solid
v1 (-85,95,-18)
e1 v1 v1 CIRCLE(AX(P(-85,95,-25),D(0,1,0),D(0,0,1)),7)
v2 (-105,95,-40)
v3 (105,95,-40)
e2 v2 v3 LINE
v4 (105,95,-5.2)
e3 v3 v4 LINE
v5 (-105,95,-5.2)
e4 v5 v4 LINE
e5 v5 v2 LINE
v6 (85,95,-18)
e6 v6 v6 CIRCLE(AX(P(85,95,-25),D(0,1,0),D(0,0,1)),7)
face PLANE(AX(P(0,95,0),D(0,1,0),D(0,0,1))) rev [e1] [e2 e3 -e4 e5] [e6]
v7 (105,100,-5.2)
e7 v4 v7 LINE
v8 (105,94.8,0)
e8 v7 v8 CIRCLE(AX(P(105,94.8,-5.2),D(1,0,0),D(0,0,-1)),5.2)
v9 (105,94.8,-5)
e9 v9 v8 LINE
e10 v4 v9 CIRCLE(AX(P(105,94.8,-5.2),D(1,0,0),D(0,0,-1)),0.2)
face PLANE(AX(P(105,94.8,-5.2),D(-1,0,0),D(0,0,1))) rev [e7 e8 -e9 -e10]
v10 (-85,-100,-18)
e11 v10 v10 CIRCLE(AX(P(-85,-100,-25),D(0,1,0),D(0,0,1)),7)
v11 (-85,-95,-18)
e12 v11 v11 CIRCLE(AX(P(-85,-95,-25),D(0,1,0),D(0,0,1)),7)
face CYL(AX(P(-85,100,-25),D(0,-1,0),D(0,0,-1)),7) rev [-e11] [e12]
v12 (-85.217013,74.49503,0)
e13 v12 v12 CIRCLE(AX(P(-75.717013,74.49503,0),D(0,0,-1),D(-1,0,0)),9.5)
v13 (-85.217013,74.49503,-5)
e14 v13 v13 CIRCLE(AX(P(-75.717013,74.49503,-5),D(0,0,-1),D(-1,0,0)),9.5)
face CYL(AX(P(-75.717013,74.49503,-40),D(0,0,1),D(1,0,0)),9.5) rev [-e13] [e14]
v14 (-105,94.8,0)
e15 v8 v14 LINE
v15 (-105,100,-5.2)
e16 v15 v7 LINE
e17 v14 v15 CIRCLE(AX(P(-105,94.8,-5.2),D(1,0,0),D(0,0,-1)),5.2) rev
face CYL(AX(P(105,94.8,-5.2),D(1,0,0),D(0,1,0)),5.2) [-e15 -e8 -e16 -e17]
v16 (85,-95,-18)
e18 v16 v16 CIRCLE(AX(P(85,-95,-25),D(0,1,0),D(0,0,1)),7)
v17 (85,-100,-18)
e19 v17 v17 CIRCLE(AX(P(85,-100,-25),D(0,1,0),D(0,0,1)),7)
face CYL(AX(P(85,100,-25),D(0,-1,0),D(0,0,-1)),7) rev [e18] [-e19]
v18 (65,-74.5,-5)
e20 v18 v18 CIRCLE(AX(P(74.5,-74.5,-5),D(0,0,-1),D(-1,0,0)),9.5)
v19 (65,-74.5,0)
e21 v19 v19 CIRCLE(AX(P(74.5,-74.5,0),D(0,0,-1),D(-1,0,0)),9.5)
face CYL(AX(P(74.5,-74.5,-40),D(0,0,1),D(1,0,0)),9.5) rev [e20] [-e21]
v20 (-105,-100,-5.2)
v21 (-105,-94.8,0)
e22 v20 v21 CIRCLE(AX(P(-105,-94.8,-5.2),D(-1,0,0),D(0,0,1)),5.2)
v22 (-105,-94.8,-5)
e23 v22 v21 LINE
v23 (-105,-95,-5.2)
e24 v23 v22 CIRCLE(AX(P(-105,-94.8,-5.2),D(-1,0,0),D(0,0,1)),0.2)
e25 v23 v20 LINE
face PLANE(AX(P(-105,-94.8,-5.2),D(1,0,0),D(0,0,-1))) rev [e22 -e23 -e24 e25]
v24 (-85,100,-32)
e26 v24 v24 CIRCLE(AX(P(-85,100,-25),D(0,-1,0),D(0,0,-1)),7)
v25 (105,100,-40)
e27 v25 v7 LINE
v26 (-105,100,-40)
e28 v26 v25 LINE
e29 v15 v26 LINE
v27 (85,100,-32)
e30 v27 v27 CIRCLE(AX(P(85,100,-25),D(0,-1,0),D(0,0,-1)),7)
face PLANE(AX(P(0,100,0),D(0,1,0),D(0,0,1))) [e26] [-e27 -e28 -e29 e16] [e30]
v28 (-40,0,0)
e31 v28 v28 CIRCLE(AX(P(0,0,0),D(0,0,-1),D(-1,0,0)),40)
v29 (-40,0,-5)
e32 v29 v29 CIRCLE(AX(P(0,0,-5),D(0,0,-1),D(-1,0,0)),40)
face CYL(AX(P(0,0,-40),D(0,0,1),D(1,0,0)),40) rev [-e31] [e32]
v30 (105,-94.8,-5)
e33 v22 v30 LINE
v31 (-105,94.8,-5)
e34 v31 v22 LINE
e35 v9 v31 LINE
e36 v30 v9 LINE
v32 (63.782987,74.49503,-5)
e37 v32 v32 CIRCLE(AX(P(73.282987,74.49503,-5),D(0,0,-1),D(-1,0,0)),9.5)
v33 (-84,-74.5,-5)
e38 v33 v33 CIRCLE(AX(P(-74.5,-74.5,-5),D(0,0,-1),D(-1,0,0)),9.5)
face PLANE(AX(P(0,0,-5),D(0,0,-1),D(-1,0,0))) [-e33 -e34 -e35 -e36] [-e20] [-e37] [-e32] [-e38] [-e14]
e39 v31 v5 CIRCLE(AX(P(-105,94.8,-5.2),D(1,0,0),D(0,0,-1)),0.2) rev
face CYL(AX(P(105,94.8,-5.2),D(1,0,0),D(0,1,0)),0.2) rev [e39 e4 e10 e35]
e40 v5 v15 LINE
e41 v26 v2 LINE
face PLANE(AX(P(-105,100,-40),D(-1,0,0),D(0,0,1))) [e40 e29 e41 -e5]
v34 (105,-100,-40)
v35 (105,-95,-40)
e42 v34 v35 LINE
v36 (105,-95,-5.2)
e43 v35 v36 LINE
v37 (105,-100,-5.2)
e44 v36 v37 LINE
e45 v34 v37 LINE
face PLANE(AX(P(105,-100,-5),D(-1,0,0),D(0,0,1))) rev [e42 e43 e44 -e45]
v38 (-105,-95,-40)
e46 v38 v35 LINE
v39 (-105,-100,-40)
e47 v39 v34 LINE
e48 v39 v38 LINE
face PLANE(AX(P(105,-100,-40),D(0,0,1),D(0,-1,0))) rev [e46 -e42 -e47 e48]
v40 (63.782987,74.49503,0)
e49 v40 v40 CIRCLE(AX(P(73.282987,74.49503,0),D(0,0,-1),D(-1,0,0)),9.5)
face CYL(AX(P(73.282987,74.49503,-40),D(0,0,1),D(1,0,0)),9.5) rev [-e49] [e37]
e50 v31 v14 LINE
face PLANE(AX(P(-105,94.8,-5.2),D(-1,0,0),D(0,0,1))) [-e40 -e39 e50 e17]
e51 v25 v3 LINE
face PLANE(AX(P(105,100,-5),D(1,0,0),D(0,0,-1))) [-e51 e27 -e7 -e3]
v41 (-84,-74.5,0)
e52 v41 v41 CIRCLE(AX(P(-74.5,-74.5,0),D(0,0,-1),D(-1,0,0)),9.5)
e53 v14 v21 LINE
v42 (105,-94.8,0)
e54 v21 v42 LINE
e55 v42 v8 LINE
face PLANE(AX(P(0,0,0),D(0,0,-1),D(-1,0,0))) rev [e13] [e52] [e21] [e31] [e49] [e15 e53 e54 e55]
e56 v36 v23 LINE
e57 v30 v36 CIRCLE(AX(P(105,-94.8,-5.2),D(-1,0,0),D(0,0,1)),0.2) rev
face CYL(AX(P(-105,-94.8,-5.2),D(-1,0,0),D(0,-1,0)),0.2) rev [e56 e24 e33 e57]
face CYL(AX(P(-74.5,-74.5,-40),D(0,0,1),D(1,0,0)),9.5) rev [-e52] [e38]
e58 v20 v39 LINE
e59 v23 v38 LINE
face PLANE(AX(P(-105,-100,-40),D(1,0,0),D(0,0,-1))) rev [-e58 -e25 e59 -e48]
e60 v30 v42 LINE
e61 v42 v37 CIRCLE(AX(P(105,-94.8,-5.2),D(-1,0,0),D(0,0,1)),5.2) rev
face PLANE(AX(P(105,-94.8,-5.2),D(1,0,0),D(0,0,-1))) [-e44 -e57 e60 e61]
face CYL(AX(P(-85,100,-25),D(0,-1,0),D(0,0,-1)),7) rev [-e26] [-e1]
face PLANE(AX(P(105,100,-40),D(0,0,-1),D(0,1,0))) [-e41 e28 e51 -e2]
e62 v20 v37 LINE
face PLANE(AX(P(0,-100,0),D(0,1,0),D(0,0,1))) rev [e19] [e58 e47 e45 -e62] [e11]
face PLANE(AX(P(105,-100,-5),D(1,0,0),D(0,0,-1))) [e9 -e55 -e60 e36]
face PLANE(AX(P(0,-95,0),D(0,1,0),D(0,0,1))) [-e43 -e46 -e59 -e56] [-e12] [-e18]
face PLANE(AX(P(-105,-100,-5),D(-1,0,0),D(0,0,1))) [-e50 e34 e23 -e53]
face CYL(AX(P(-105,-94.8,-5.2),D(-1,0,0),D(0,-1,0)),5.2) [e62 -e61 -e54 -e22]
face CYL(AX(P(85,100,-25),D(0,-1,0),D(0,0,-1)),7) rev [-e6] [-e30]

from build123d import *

# Parameters (mm, degrees)
SKETCH1_W                    = 210
SKETCH1_H                    = 200
BASE_FLANGE1_DEPTH           = 5
EDGE_FLANGE1_STRIP_W         = 20.4
EDGE_FLANGE1_STRIP_H         = 5
EDGE_FLANGE1_STRIP_CUT_DEPTH = 210
EDGE_FLANGE1_DEPTH           = 210
EDGE_FLANGE2_STRIP_W         = 20.4
EDGE_FLANGE2_STRIP_H         = 5
EDGE_FLANGE2_STRIP_CUT_DEPTH = 210
EDGE_FLANGE2_DEPTH           = 210
CUT_EXTRUDE1_DEPTH           = 151.416089565
CUT_EXTRUDE1_DEPTH_BACK      = 151.416089565
SKETCH12_R                   = 40
CUT_EXTRUDE2_DEPTH           = 151.416089565
CUT_EXTRUDE2_DEPTH_BACK      = 151.416089565
SKETCH13_R                   = 9.5
CUT_EXTRUDE3_DEPTH           = 230.401394939
CUT_EXTRUDE3_DEPTH_BACK      = 230.401394939
SKETCH14_R                   = 7


# Sheet-metal steps are written as plain solids
with BuildPart() as part:
    # Sketch1 → Base-Flange1 (new body)
    with BuildSketch(Plane.XY):
        Rectangle(SKETCH1_W, SKETCH1_H)
    extrude(amount=-BASE_FLANGE1_DEPTH)

    # Edge-Flange1 strip (across the edge) → Edge-Flange1 strip cut (cut)
    with BuildSketch(Plane(origin=(-105, 100, -5), x_dir=(0, -1, 0), z_dir=(1, 0, 0))):
        with Locations((-5, -2.5)):
            Rectangle(EDGE_FLANGE1_STRIP_W, EDGE_FLANGE1_STRIP_H)
    extrude(amount=EDGE_FLANGE1_STRIP_CUT_DEPTH, mode=Mode.SUBTRACT)

    # Edge-Flange1 section (across the edge) → Edge-Flange1 (add)
    with BuildSketch(Plane(origin=(-105, 100, -5), x_dir=(0, -1, 0), z_dir=(1, 0, 0))):
        with BuildLine():
            Line((0, 0.2), (0, 35))
            Line((0, 35), (5, 35))
            Line((5, 35), (5, 0.2))
            ThreePointArc((5, 0.2), (5.058578644, 0.058578644), (5.2, 0))
            Line((5.2, 0), (5.2, -5))
            ThreePointArc((5.2, -5), (1.523044738, -3.476955262), (0, 0.2))
        make_face()
    extrude(amount=EDGE_FLANGE1_DEPTH)

    # Edge-Flange2 strip (across the edge) → Edge-Flange2 strip cut (cut)
    with BuildSketch(Plane(origin=(105, -100, -5), x_dir=(0, 1, 0), z_dir=(-1, 0, 0))):
        with Locations((-5, -2.5)):
            Rectangle(EDGE_FLANGE2_STRIP_W, EDGE_FLANGE2_STRIP_H)
    extrude(amount=EDGE_FLANGE2_STRIP_CUT_DEPTH, mode=Mode.SUBTRACT)

    # Edge-Flange2 section (across the edge) → Edge-Flange2 (add)
    with BuildSketch(Plane(origin=(105, -100, -5), x_dir=(0, 1, 0), z_dir=(-1, 0, 0))):
        with BuildLine():
            Line((0, 0.2), (0, 35))
            Line((0, 35), (5, 35))
            Line((5, 35), (5, 0.2))
            ThreePointArc((5, 0.2), (5.058578644, 0.058578644), (5.2, 0))
            Line((5.2, 0), (5.2, -5))
            ThreePointArc((5.2, -5), (1.523044738, -3.476955262), (0, 0.2))
        make_face()
    extrude(amount=EDGE_FLANGE2_DEPTH)

    # Sketch12 → Cut-Extrude1 (cut, two sides: drawn at the far end of the back side and taken through both)
    with BuildSketch(Plane.XY.offset(-CUT_EXTRUDE1_DEPTH_BACK)):
        with Locations(Location((0, 0, 0), (0, 0, 180))):
            Circle(SKETCH12_R)
    extrude(amount=CUT_EXTRUDE1_DEPTH + CUT_EXTRUDE1_DEPTH_BACK, mode=Mode.SUBTRACT)

    # Sketch13 → Cut-Extrude2 (cut, two sides: drawn at the far end of the back side and taken through both)
    with BuildSketch(Plane.XY.offset(-CUT_EXTRUDE2_DEPTH_BACK)):
        with Locations(Location((73.282986518, 74.49502971, 0), (0, 0, 180))):
            Circle(SKETCH13_R)
        with Locations(Location((-75.717013482, 74.49502971, 0), (0, 0, 180))):
            Circle(SKETCH13_R)
        with Locations(Location((-74.5, -74.5, 0), (0, 0, 180))):
            Circle(SKETCH13_R)
        with Locations(Location((74.5, -74.5, 0), (0, 0, 180))):
            Circle(SKETCH13_R)
    extrude(amount=CUT_EXTRUDE2_DEPTH + CUT_EXTRUDE2_DEPTH_BACK, mode=Mode.SUBTRACT)

    # Sketch14 → Cut-Extrude3 (cut, two sides: drawn at the far end of the back side and taken through both)
    with BuildSketch(Plane(origin=(0, -100, 0), x_dir=(-1, 0, 0), z_dir=(0, -1, 0)).offset(-CUT_EXTRUDE3_DEPTH_BACK)):
        with Locations(Location((85, 25, 0), (0, 0, 270))):
            Circle(SKETCH14_R)
        with Locations(Location((-85, 25, 0), (0, 0, 270))):
            Circle(SKETCH14_R)
    extrude(amount=CUT_EXTRUDE3_DEPTH + CUT_EXTRUDE3_DEPTH_BACK, mode=Mode.SUBTRACT)


solid = part.part
